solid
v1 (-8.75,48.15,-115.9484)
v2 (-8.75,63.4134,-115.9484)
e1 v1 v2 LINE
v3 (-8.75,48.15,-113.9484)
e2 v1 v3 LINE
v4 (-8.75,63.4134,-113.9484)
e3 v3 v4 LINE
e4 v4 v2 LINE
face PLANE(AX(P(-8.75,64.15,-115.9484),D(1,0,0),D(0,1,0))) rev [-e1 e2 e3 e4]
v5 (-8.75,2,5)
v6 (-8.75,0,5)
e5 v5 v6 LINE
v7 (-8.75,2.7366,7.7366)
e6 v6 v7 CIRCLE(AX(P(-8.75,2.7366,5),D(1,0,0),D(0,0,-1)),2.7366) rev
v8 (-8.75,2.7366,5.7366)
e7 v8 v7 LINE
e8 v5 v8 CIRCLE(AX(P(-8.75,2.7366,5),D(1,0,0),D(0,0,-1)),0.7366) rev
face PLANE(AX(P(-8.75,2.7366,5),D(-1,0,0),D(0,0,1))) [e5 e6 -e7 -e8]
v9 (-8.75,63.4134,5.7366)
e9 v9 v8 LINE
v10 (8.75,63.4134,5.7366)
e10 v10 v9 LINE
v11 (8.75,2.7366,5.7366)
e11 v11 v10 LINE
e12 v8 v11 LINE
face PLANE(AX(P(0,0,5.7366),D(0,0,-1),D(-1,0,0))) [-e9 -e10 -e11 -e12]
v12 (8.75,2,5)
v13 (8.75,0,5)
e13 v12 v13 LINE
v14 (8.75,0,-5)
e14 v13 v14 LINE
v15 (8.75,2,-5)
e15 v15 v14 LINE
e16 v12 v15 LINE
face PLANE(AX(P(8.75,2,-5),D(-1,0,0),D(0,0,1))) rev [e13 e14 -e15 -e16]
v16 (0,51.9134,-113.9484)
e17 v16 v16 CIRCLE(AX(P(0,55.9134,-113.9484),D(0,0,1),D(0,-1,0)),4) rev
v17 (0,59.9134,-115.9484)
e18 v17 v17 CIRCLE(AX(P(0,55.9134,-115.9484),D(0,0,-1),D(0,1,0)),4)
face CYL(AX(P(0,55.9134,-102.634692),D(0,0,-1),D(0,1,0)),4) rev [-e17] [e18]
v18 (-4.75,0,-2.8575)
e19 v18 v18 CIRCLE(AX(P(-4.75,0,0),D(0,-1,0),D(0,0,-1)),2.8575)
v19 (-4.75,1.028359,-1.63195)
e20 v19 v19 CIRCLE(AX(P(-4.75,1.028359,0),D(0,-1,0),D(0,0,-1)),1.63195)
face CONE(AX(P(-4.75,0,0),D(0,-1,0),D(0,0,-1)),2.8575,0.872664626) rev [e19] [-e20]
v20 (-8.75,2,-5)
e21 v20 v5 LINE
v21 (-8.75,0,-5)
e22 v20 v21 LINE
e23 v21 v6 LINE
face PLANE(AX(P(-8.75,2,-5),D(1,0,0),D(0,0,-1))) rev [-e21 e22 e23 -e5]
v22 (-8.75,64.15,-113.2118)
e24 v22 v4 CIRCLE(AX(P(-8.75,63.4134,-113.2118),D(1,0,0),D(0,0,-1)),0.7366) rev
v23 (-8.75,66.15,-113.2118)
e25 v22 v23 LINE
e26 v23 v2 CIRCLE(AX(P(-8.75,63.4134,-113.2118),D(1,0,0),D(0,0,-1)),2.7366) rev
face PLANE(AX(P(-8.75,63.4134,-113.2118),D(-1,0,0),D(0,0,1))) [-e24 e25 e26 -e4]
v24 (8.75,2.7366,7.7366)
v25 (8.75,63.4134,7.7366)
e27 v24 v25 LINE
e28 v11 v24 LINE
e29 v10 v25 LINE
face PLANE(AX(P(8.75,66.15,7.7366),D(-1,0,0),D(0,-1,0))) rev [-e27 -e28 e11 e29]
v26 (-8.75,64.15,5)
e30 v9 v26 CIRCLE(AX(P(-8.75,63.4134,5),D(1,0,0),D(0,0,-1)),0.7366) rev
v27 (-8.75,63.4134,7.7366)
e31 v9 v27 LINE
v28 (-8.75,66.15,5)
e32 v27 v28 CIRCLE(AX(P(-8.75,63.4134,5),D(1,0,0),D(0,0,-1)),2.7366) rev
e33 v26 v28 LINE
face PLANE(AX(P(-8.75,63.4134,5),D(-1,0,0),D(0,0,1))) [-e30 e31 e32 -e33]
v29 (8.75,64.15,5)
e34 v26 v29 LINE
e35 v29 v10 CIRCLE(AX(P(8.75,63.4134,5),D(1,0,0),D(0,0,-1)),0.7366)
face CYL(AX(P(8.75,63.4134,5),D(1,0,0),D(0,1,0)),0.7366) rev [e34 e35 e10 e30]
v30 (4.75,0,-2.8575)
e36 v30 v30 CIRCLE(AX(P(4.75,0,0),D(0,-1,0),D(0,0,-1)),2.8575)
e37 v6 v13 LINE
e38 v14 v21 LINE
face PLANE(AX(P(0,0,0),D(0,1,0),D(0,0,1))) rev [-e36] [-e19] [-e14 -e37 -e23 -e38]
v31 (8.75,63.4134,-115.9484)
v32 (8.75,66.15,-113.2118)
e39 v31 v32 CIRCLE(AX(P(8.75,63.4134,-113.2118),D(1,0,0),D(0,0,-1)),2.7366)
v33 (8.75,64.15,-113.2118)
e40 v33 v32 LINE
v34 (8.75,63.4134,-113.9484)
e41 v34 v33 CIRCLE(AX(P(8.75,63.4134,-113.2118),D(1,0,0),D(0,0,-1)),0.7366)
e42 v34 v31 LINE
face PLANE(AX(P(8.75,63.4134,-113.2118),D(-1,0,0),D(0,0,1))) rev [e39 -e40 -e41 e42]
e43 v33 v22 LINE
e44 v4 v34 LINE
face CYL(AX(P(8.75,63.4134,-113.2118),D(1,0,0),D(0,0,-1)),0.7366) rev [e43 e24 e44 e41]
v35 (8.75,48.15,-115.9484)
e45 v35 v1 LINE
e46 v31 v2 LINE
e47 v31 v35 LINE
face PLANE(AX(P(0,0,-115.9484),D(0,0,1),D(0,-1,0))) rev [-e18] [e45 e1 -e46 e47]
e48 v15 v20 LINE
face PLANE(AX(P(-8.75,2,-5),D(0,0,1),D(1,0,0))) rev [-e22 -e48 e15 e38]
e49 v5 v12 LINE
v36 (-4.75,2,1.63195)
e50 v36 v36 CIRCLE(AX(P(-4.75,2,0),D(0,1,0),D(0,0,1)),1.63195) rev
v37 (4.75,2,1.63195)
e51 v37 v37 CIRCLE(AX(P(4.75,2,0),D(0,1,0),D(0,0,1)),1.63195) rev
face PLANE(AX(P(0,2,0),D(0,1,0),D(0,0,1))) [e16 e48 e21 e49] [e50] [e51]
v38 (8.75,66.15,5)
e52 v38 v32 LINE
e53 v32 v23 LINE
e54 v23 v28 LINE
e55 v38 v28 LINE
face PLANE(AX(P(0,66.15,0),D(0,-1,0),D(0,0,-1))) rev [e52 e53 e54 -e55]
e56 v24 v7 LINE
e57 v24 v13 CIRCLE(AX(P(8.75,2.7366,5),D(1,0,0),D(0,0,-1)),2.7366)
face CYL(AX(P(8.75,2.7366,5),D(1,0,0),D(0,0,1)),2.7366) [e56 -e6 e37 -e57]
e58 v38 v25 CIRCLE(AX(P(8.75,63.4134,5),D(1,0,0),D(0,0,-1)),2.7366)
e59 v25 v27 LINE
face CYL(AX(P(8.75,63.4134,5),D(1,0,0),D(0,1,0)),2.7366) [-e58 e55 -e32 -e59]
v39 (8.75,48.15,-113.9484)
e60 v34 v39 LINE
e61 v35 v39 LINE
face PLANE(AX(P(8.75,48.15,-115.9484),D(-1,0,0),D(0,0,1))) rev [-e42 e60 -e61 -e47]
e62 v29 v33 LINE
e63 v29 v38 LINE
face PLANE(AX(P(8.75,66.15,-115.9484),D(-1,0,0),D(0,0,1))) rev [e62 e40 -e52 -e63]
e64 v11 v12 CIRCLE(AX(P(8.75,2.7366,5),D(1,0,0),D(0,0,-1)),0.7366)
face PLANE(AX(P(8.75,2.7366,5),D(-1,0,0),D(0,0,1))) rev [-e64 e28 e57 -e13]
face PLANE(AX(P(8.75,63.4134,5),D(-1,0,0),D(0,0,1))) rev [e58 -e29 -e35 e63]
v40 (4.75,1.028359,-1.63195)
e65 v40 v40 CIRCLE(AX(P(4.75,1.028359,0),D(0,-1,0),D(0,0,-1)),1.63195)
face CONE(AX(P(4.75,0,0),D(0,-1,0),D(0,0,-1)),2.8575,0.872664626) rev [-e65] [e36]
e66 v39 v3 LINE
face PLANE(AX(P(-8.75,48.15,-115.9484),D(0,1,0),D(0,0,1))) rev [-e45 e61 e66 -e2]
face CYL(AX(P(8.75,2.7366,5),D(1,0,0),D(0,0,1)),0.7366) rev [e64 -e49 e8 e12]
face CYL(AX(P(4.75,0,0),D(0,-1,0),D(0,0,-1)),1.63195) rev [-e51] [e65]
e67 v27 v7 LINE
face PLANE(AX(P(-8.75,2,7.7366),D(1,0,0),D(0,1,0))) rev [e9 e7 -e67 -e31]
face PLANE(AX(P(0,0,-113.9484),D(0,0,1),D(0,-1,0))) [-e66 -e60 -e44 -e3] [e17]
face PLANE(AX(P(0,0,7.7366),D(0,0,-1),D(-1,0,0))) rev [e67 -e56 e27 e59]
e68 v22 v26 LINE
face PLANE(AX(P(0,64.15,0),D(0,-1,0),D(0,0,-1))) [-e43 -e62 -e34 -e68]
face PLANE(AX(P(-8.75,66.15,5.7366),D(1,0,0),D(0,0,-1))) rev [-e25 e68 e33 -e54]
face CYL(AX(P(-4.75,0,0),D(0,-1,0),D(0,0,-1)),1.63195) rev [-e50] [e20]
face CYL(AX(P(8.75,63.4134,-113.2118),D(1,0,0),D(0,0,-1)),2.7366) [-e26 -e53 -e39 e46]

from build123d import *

# Parameters (mm, degrees)
SKETCH1_W                                         = 17.5
SKETCH1_H                                         = 10
BASE_FLANGE1_DEPTH                                = 2
EDGE_FLANGE1_DEPTH                                = 17.5
EDGE_FLANGE2_STRIP_W                              = 9.4732
EDGE_FLANGE2_STRIP_H                              = 2
EDGE_FLANGE2_STRIP_CUT_DEPTH                      = 17.5
EDGE_FLANGE2_DEPTH                                = 17.5
EDGE_FLANGE3_STRIP_W                              = 9.4732
EDGE_FLANGE3_STRIP_H                              = 2
EDGE_FLANGE3_STRIP_CUT_DEPTH                      = 17.5
EDGE_FLANGE3_DEPTH                                = 17.5
SKETCH18_R                                        = 4
CUT_EXTRUDE2_DEPTH                                = 2
CSK_FOR_4_FLAT_HEAD_MACHINE_SCREW_100_D           = 3.2639
CSK_FOR_4_FLAT_HEAD_MACHINE_SCREW_100_DEPTH       = 2
CSK_FOR_4_FLAT_HEAD_MACHINE_SCREW_100_CSINK_D     = 5.715
CSK_FOR_4_FLAT_HEAD_MACHINE_SCREW_100_CSINK_ANGLE = 100
CSK_FOR_4_FLAT_HEAD_MACHINE_SCREW_100_TIP         = 0.980574487


# Sheet-metal steps are written as plain solids
with BuildPart() as part:
    # Sketch1 → Base-Flange1 (new body)
    with BuildSketch(Plane(origin=(0, 0, 0), x_dir=(1, 0, 0), z_dir=(0, 1, 0))):
        Rectangle(SKETCH1_W, SKETCH1_H)
    extrude(amount=BASE_FLANGE1_DEPTH)

    # Edge-Flange1 section (across the edge) → Edge-Flange1 (add)
    with BuildSketch(Plane(origin=(-8.75, 2, 5.7366), x_dir=(0, 0, -1), z_dir=(1, 0, 0))):
        with BuildLine():
            Line((-2, 0.7366), (-2, 64.15))
            Line((-2, 64.15), (0, 64.15))
            Line((0, 64.15), (0, 0.7366))
            ThreePointArc((0, 0.7366), (0.215745145, 0.215745145), (0.7366, 0))
            Line((0.7366, 0), (0.7366, -2))
            ThreePointArc((0.7366, -2), (-1.198468417, -1.198468417), (-2, 0.7366))
        make_face()
    extrude(amount=EDGE_FLANGE1_DEPTH)

    # Edge-Flange2 strip (across the edge) → Edge-Flange2 strip cut (cut)
    with BuildSketch(Plane(origin=(-8.75, 66.15, 5.7366), x_dir=(0, -1, 0), z_dir=(1, 0, 0))):
        with Locations((-2, -1)):
            Rectangle(EDGE_FLANGE2_STRIP_W, EDGE_FLANGE2_STRIP_H)
    extrude(amount=EDGE_FLANGE2_STRIP_CUT_DEPTH, mode=Mode.SUBTRACT)

    # Edge-Flange2 section (across the edge) → Edge-Flange2 (add)
    with BuildSketch(Plane(origin=(-8.75, 66.15, 5.7366), x_dir=(0, -1, 0), z_dir=(1, 0, 0))):
        with BuildLine():
            Line((0, 0.7366), (0, 121.685))
            Line((0, 121.685), (2, 121.685))
            Line((2, 121.685), (2, 0.7366))
            ThreePointArc((2, 0.7366), (2.215745145, 0.215745145), (2.7366, 0))
            Line((2.7366, 0), (2.7366, -2))
            ThreePointArc((2.7366, -2), (0.801531583, -1.198468417), (0, 0.7366))
        make_face()
    extrude(amount=EDGE_FLANGE2_DEPTH)

    # Edge-Flange3 strip (across the edge) → Edge-Flange3 strip cut (cut)
    with BuildSketch(Plane(origin=(-8.75, 64.15, -115.9484), x_dir=(0, 0, 1), z_dir=(1, 0, 0))):
        with Locations((-2, -1)):
            Rectangle(EDGE_FLANGE3_STRIP_W, EDGE_FLANGE3_STRIP_H)
    extrude(amount=EDGE_FLANGE3_STRIP_CUT_DEPTH, mode=Mode.SUBTRACT)

    # Edge-Flange3 section (across the edge) → Edge-Flange3 (add)
    with BuildSketch(Plane(origin=(-8.75, 64.15, -115.9484), x_dir=(0, 0, 1), z_dir=(1, 0, 0))):
        with BuildLine():
            Line((0, 0.7366), (0, 16))
            Line((0, 16), (2, 16))
            Line((2, 16), (2, 0.7366))
            ThreePointArc((2, 0.7366), (2.215745145, 0.215745145), (2.7366, 0))
            Line((2.7366, 0), (2.7366, -2))
            ThreePointArc((2.7366, -2), (0.801531583, -1.198468417), (0, 0.7366))
        make_face()
    extrude(amount=EDGE_FLANGE3_DEPTH)

    # Sketch18 → Cut-Extrude2 (cut)
    with BuildSketch(Plane(origin=(0, 0, -115.9484), x_dir=(-1, 0, 0), z_dir=(0, 0, -1))):
        with Locations(Location((0, 55.9134, 0), (0, 0, 90))):
            Circle(SKETCH18_R)
    extrude(amount=-CUT_EXTRUDE2_DEPTH, mode=Mode.SUBTRACT)

    # CSK for #4 Flat Head Machine Screw (100)1
    with Locations(Plane.XZ):
        with Locations((4.75, 0), (-4.75, 0)):
            CounterSinkHole(CSK_FOR_4_FLAT_HEAD_MACHINE_SCREW_100_D / 2, CSK_FOR_4_FLAT_HEAD_MACHINE_SCREW_100_CSINK_D / 2, depth=CSK_FOR_4_FLAT_HEAD_MACHINE_SCREW_100_DEPTH, counter_sink_angle=CSK_FOR_4_FLAT_HEAD_MACHINE_SCREW_100_CSINK_ANGLE)
            with Locations((0, 0, -(CSK_FOR_4_FLAT_HEAD_MACHINE_SCREW_100_DEPTH + CSK_FOR_4_FLAT_HEAD_MACHINE_SCREW_100_TIP / 2))):  # 118° drill point
                Cone(0, CSK_FOR_4_FLAT_HEAD_MACHINE_SCREW_100_D / 2, CSK_FOR_4_FLAT_HEAD_MACHINE_SCREW_100_TIP, mode=Mode.SUBTRACT)


solid = part.part
